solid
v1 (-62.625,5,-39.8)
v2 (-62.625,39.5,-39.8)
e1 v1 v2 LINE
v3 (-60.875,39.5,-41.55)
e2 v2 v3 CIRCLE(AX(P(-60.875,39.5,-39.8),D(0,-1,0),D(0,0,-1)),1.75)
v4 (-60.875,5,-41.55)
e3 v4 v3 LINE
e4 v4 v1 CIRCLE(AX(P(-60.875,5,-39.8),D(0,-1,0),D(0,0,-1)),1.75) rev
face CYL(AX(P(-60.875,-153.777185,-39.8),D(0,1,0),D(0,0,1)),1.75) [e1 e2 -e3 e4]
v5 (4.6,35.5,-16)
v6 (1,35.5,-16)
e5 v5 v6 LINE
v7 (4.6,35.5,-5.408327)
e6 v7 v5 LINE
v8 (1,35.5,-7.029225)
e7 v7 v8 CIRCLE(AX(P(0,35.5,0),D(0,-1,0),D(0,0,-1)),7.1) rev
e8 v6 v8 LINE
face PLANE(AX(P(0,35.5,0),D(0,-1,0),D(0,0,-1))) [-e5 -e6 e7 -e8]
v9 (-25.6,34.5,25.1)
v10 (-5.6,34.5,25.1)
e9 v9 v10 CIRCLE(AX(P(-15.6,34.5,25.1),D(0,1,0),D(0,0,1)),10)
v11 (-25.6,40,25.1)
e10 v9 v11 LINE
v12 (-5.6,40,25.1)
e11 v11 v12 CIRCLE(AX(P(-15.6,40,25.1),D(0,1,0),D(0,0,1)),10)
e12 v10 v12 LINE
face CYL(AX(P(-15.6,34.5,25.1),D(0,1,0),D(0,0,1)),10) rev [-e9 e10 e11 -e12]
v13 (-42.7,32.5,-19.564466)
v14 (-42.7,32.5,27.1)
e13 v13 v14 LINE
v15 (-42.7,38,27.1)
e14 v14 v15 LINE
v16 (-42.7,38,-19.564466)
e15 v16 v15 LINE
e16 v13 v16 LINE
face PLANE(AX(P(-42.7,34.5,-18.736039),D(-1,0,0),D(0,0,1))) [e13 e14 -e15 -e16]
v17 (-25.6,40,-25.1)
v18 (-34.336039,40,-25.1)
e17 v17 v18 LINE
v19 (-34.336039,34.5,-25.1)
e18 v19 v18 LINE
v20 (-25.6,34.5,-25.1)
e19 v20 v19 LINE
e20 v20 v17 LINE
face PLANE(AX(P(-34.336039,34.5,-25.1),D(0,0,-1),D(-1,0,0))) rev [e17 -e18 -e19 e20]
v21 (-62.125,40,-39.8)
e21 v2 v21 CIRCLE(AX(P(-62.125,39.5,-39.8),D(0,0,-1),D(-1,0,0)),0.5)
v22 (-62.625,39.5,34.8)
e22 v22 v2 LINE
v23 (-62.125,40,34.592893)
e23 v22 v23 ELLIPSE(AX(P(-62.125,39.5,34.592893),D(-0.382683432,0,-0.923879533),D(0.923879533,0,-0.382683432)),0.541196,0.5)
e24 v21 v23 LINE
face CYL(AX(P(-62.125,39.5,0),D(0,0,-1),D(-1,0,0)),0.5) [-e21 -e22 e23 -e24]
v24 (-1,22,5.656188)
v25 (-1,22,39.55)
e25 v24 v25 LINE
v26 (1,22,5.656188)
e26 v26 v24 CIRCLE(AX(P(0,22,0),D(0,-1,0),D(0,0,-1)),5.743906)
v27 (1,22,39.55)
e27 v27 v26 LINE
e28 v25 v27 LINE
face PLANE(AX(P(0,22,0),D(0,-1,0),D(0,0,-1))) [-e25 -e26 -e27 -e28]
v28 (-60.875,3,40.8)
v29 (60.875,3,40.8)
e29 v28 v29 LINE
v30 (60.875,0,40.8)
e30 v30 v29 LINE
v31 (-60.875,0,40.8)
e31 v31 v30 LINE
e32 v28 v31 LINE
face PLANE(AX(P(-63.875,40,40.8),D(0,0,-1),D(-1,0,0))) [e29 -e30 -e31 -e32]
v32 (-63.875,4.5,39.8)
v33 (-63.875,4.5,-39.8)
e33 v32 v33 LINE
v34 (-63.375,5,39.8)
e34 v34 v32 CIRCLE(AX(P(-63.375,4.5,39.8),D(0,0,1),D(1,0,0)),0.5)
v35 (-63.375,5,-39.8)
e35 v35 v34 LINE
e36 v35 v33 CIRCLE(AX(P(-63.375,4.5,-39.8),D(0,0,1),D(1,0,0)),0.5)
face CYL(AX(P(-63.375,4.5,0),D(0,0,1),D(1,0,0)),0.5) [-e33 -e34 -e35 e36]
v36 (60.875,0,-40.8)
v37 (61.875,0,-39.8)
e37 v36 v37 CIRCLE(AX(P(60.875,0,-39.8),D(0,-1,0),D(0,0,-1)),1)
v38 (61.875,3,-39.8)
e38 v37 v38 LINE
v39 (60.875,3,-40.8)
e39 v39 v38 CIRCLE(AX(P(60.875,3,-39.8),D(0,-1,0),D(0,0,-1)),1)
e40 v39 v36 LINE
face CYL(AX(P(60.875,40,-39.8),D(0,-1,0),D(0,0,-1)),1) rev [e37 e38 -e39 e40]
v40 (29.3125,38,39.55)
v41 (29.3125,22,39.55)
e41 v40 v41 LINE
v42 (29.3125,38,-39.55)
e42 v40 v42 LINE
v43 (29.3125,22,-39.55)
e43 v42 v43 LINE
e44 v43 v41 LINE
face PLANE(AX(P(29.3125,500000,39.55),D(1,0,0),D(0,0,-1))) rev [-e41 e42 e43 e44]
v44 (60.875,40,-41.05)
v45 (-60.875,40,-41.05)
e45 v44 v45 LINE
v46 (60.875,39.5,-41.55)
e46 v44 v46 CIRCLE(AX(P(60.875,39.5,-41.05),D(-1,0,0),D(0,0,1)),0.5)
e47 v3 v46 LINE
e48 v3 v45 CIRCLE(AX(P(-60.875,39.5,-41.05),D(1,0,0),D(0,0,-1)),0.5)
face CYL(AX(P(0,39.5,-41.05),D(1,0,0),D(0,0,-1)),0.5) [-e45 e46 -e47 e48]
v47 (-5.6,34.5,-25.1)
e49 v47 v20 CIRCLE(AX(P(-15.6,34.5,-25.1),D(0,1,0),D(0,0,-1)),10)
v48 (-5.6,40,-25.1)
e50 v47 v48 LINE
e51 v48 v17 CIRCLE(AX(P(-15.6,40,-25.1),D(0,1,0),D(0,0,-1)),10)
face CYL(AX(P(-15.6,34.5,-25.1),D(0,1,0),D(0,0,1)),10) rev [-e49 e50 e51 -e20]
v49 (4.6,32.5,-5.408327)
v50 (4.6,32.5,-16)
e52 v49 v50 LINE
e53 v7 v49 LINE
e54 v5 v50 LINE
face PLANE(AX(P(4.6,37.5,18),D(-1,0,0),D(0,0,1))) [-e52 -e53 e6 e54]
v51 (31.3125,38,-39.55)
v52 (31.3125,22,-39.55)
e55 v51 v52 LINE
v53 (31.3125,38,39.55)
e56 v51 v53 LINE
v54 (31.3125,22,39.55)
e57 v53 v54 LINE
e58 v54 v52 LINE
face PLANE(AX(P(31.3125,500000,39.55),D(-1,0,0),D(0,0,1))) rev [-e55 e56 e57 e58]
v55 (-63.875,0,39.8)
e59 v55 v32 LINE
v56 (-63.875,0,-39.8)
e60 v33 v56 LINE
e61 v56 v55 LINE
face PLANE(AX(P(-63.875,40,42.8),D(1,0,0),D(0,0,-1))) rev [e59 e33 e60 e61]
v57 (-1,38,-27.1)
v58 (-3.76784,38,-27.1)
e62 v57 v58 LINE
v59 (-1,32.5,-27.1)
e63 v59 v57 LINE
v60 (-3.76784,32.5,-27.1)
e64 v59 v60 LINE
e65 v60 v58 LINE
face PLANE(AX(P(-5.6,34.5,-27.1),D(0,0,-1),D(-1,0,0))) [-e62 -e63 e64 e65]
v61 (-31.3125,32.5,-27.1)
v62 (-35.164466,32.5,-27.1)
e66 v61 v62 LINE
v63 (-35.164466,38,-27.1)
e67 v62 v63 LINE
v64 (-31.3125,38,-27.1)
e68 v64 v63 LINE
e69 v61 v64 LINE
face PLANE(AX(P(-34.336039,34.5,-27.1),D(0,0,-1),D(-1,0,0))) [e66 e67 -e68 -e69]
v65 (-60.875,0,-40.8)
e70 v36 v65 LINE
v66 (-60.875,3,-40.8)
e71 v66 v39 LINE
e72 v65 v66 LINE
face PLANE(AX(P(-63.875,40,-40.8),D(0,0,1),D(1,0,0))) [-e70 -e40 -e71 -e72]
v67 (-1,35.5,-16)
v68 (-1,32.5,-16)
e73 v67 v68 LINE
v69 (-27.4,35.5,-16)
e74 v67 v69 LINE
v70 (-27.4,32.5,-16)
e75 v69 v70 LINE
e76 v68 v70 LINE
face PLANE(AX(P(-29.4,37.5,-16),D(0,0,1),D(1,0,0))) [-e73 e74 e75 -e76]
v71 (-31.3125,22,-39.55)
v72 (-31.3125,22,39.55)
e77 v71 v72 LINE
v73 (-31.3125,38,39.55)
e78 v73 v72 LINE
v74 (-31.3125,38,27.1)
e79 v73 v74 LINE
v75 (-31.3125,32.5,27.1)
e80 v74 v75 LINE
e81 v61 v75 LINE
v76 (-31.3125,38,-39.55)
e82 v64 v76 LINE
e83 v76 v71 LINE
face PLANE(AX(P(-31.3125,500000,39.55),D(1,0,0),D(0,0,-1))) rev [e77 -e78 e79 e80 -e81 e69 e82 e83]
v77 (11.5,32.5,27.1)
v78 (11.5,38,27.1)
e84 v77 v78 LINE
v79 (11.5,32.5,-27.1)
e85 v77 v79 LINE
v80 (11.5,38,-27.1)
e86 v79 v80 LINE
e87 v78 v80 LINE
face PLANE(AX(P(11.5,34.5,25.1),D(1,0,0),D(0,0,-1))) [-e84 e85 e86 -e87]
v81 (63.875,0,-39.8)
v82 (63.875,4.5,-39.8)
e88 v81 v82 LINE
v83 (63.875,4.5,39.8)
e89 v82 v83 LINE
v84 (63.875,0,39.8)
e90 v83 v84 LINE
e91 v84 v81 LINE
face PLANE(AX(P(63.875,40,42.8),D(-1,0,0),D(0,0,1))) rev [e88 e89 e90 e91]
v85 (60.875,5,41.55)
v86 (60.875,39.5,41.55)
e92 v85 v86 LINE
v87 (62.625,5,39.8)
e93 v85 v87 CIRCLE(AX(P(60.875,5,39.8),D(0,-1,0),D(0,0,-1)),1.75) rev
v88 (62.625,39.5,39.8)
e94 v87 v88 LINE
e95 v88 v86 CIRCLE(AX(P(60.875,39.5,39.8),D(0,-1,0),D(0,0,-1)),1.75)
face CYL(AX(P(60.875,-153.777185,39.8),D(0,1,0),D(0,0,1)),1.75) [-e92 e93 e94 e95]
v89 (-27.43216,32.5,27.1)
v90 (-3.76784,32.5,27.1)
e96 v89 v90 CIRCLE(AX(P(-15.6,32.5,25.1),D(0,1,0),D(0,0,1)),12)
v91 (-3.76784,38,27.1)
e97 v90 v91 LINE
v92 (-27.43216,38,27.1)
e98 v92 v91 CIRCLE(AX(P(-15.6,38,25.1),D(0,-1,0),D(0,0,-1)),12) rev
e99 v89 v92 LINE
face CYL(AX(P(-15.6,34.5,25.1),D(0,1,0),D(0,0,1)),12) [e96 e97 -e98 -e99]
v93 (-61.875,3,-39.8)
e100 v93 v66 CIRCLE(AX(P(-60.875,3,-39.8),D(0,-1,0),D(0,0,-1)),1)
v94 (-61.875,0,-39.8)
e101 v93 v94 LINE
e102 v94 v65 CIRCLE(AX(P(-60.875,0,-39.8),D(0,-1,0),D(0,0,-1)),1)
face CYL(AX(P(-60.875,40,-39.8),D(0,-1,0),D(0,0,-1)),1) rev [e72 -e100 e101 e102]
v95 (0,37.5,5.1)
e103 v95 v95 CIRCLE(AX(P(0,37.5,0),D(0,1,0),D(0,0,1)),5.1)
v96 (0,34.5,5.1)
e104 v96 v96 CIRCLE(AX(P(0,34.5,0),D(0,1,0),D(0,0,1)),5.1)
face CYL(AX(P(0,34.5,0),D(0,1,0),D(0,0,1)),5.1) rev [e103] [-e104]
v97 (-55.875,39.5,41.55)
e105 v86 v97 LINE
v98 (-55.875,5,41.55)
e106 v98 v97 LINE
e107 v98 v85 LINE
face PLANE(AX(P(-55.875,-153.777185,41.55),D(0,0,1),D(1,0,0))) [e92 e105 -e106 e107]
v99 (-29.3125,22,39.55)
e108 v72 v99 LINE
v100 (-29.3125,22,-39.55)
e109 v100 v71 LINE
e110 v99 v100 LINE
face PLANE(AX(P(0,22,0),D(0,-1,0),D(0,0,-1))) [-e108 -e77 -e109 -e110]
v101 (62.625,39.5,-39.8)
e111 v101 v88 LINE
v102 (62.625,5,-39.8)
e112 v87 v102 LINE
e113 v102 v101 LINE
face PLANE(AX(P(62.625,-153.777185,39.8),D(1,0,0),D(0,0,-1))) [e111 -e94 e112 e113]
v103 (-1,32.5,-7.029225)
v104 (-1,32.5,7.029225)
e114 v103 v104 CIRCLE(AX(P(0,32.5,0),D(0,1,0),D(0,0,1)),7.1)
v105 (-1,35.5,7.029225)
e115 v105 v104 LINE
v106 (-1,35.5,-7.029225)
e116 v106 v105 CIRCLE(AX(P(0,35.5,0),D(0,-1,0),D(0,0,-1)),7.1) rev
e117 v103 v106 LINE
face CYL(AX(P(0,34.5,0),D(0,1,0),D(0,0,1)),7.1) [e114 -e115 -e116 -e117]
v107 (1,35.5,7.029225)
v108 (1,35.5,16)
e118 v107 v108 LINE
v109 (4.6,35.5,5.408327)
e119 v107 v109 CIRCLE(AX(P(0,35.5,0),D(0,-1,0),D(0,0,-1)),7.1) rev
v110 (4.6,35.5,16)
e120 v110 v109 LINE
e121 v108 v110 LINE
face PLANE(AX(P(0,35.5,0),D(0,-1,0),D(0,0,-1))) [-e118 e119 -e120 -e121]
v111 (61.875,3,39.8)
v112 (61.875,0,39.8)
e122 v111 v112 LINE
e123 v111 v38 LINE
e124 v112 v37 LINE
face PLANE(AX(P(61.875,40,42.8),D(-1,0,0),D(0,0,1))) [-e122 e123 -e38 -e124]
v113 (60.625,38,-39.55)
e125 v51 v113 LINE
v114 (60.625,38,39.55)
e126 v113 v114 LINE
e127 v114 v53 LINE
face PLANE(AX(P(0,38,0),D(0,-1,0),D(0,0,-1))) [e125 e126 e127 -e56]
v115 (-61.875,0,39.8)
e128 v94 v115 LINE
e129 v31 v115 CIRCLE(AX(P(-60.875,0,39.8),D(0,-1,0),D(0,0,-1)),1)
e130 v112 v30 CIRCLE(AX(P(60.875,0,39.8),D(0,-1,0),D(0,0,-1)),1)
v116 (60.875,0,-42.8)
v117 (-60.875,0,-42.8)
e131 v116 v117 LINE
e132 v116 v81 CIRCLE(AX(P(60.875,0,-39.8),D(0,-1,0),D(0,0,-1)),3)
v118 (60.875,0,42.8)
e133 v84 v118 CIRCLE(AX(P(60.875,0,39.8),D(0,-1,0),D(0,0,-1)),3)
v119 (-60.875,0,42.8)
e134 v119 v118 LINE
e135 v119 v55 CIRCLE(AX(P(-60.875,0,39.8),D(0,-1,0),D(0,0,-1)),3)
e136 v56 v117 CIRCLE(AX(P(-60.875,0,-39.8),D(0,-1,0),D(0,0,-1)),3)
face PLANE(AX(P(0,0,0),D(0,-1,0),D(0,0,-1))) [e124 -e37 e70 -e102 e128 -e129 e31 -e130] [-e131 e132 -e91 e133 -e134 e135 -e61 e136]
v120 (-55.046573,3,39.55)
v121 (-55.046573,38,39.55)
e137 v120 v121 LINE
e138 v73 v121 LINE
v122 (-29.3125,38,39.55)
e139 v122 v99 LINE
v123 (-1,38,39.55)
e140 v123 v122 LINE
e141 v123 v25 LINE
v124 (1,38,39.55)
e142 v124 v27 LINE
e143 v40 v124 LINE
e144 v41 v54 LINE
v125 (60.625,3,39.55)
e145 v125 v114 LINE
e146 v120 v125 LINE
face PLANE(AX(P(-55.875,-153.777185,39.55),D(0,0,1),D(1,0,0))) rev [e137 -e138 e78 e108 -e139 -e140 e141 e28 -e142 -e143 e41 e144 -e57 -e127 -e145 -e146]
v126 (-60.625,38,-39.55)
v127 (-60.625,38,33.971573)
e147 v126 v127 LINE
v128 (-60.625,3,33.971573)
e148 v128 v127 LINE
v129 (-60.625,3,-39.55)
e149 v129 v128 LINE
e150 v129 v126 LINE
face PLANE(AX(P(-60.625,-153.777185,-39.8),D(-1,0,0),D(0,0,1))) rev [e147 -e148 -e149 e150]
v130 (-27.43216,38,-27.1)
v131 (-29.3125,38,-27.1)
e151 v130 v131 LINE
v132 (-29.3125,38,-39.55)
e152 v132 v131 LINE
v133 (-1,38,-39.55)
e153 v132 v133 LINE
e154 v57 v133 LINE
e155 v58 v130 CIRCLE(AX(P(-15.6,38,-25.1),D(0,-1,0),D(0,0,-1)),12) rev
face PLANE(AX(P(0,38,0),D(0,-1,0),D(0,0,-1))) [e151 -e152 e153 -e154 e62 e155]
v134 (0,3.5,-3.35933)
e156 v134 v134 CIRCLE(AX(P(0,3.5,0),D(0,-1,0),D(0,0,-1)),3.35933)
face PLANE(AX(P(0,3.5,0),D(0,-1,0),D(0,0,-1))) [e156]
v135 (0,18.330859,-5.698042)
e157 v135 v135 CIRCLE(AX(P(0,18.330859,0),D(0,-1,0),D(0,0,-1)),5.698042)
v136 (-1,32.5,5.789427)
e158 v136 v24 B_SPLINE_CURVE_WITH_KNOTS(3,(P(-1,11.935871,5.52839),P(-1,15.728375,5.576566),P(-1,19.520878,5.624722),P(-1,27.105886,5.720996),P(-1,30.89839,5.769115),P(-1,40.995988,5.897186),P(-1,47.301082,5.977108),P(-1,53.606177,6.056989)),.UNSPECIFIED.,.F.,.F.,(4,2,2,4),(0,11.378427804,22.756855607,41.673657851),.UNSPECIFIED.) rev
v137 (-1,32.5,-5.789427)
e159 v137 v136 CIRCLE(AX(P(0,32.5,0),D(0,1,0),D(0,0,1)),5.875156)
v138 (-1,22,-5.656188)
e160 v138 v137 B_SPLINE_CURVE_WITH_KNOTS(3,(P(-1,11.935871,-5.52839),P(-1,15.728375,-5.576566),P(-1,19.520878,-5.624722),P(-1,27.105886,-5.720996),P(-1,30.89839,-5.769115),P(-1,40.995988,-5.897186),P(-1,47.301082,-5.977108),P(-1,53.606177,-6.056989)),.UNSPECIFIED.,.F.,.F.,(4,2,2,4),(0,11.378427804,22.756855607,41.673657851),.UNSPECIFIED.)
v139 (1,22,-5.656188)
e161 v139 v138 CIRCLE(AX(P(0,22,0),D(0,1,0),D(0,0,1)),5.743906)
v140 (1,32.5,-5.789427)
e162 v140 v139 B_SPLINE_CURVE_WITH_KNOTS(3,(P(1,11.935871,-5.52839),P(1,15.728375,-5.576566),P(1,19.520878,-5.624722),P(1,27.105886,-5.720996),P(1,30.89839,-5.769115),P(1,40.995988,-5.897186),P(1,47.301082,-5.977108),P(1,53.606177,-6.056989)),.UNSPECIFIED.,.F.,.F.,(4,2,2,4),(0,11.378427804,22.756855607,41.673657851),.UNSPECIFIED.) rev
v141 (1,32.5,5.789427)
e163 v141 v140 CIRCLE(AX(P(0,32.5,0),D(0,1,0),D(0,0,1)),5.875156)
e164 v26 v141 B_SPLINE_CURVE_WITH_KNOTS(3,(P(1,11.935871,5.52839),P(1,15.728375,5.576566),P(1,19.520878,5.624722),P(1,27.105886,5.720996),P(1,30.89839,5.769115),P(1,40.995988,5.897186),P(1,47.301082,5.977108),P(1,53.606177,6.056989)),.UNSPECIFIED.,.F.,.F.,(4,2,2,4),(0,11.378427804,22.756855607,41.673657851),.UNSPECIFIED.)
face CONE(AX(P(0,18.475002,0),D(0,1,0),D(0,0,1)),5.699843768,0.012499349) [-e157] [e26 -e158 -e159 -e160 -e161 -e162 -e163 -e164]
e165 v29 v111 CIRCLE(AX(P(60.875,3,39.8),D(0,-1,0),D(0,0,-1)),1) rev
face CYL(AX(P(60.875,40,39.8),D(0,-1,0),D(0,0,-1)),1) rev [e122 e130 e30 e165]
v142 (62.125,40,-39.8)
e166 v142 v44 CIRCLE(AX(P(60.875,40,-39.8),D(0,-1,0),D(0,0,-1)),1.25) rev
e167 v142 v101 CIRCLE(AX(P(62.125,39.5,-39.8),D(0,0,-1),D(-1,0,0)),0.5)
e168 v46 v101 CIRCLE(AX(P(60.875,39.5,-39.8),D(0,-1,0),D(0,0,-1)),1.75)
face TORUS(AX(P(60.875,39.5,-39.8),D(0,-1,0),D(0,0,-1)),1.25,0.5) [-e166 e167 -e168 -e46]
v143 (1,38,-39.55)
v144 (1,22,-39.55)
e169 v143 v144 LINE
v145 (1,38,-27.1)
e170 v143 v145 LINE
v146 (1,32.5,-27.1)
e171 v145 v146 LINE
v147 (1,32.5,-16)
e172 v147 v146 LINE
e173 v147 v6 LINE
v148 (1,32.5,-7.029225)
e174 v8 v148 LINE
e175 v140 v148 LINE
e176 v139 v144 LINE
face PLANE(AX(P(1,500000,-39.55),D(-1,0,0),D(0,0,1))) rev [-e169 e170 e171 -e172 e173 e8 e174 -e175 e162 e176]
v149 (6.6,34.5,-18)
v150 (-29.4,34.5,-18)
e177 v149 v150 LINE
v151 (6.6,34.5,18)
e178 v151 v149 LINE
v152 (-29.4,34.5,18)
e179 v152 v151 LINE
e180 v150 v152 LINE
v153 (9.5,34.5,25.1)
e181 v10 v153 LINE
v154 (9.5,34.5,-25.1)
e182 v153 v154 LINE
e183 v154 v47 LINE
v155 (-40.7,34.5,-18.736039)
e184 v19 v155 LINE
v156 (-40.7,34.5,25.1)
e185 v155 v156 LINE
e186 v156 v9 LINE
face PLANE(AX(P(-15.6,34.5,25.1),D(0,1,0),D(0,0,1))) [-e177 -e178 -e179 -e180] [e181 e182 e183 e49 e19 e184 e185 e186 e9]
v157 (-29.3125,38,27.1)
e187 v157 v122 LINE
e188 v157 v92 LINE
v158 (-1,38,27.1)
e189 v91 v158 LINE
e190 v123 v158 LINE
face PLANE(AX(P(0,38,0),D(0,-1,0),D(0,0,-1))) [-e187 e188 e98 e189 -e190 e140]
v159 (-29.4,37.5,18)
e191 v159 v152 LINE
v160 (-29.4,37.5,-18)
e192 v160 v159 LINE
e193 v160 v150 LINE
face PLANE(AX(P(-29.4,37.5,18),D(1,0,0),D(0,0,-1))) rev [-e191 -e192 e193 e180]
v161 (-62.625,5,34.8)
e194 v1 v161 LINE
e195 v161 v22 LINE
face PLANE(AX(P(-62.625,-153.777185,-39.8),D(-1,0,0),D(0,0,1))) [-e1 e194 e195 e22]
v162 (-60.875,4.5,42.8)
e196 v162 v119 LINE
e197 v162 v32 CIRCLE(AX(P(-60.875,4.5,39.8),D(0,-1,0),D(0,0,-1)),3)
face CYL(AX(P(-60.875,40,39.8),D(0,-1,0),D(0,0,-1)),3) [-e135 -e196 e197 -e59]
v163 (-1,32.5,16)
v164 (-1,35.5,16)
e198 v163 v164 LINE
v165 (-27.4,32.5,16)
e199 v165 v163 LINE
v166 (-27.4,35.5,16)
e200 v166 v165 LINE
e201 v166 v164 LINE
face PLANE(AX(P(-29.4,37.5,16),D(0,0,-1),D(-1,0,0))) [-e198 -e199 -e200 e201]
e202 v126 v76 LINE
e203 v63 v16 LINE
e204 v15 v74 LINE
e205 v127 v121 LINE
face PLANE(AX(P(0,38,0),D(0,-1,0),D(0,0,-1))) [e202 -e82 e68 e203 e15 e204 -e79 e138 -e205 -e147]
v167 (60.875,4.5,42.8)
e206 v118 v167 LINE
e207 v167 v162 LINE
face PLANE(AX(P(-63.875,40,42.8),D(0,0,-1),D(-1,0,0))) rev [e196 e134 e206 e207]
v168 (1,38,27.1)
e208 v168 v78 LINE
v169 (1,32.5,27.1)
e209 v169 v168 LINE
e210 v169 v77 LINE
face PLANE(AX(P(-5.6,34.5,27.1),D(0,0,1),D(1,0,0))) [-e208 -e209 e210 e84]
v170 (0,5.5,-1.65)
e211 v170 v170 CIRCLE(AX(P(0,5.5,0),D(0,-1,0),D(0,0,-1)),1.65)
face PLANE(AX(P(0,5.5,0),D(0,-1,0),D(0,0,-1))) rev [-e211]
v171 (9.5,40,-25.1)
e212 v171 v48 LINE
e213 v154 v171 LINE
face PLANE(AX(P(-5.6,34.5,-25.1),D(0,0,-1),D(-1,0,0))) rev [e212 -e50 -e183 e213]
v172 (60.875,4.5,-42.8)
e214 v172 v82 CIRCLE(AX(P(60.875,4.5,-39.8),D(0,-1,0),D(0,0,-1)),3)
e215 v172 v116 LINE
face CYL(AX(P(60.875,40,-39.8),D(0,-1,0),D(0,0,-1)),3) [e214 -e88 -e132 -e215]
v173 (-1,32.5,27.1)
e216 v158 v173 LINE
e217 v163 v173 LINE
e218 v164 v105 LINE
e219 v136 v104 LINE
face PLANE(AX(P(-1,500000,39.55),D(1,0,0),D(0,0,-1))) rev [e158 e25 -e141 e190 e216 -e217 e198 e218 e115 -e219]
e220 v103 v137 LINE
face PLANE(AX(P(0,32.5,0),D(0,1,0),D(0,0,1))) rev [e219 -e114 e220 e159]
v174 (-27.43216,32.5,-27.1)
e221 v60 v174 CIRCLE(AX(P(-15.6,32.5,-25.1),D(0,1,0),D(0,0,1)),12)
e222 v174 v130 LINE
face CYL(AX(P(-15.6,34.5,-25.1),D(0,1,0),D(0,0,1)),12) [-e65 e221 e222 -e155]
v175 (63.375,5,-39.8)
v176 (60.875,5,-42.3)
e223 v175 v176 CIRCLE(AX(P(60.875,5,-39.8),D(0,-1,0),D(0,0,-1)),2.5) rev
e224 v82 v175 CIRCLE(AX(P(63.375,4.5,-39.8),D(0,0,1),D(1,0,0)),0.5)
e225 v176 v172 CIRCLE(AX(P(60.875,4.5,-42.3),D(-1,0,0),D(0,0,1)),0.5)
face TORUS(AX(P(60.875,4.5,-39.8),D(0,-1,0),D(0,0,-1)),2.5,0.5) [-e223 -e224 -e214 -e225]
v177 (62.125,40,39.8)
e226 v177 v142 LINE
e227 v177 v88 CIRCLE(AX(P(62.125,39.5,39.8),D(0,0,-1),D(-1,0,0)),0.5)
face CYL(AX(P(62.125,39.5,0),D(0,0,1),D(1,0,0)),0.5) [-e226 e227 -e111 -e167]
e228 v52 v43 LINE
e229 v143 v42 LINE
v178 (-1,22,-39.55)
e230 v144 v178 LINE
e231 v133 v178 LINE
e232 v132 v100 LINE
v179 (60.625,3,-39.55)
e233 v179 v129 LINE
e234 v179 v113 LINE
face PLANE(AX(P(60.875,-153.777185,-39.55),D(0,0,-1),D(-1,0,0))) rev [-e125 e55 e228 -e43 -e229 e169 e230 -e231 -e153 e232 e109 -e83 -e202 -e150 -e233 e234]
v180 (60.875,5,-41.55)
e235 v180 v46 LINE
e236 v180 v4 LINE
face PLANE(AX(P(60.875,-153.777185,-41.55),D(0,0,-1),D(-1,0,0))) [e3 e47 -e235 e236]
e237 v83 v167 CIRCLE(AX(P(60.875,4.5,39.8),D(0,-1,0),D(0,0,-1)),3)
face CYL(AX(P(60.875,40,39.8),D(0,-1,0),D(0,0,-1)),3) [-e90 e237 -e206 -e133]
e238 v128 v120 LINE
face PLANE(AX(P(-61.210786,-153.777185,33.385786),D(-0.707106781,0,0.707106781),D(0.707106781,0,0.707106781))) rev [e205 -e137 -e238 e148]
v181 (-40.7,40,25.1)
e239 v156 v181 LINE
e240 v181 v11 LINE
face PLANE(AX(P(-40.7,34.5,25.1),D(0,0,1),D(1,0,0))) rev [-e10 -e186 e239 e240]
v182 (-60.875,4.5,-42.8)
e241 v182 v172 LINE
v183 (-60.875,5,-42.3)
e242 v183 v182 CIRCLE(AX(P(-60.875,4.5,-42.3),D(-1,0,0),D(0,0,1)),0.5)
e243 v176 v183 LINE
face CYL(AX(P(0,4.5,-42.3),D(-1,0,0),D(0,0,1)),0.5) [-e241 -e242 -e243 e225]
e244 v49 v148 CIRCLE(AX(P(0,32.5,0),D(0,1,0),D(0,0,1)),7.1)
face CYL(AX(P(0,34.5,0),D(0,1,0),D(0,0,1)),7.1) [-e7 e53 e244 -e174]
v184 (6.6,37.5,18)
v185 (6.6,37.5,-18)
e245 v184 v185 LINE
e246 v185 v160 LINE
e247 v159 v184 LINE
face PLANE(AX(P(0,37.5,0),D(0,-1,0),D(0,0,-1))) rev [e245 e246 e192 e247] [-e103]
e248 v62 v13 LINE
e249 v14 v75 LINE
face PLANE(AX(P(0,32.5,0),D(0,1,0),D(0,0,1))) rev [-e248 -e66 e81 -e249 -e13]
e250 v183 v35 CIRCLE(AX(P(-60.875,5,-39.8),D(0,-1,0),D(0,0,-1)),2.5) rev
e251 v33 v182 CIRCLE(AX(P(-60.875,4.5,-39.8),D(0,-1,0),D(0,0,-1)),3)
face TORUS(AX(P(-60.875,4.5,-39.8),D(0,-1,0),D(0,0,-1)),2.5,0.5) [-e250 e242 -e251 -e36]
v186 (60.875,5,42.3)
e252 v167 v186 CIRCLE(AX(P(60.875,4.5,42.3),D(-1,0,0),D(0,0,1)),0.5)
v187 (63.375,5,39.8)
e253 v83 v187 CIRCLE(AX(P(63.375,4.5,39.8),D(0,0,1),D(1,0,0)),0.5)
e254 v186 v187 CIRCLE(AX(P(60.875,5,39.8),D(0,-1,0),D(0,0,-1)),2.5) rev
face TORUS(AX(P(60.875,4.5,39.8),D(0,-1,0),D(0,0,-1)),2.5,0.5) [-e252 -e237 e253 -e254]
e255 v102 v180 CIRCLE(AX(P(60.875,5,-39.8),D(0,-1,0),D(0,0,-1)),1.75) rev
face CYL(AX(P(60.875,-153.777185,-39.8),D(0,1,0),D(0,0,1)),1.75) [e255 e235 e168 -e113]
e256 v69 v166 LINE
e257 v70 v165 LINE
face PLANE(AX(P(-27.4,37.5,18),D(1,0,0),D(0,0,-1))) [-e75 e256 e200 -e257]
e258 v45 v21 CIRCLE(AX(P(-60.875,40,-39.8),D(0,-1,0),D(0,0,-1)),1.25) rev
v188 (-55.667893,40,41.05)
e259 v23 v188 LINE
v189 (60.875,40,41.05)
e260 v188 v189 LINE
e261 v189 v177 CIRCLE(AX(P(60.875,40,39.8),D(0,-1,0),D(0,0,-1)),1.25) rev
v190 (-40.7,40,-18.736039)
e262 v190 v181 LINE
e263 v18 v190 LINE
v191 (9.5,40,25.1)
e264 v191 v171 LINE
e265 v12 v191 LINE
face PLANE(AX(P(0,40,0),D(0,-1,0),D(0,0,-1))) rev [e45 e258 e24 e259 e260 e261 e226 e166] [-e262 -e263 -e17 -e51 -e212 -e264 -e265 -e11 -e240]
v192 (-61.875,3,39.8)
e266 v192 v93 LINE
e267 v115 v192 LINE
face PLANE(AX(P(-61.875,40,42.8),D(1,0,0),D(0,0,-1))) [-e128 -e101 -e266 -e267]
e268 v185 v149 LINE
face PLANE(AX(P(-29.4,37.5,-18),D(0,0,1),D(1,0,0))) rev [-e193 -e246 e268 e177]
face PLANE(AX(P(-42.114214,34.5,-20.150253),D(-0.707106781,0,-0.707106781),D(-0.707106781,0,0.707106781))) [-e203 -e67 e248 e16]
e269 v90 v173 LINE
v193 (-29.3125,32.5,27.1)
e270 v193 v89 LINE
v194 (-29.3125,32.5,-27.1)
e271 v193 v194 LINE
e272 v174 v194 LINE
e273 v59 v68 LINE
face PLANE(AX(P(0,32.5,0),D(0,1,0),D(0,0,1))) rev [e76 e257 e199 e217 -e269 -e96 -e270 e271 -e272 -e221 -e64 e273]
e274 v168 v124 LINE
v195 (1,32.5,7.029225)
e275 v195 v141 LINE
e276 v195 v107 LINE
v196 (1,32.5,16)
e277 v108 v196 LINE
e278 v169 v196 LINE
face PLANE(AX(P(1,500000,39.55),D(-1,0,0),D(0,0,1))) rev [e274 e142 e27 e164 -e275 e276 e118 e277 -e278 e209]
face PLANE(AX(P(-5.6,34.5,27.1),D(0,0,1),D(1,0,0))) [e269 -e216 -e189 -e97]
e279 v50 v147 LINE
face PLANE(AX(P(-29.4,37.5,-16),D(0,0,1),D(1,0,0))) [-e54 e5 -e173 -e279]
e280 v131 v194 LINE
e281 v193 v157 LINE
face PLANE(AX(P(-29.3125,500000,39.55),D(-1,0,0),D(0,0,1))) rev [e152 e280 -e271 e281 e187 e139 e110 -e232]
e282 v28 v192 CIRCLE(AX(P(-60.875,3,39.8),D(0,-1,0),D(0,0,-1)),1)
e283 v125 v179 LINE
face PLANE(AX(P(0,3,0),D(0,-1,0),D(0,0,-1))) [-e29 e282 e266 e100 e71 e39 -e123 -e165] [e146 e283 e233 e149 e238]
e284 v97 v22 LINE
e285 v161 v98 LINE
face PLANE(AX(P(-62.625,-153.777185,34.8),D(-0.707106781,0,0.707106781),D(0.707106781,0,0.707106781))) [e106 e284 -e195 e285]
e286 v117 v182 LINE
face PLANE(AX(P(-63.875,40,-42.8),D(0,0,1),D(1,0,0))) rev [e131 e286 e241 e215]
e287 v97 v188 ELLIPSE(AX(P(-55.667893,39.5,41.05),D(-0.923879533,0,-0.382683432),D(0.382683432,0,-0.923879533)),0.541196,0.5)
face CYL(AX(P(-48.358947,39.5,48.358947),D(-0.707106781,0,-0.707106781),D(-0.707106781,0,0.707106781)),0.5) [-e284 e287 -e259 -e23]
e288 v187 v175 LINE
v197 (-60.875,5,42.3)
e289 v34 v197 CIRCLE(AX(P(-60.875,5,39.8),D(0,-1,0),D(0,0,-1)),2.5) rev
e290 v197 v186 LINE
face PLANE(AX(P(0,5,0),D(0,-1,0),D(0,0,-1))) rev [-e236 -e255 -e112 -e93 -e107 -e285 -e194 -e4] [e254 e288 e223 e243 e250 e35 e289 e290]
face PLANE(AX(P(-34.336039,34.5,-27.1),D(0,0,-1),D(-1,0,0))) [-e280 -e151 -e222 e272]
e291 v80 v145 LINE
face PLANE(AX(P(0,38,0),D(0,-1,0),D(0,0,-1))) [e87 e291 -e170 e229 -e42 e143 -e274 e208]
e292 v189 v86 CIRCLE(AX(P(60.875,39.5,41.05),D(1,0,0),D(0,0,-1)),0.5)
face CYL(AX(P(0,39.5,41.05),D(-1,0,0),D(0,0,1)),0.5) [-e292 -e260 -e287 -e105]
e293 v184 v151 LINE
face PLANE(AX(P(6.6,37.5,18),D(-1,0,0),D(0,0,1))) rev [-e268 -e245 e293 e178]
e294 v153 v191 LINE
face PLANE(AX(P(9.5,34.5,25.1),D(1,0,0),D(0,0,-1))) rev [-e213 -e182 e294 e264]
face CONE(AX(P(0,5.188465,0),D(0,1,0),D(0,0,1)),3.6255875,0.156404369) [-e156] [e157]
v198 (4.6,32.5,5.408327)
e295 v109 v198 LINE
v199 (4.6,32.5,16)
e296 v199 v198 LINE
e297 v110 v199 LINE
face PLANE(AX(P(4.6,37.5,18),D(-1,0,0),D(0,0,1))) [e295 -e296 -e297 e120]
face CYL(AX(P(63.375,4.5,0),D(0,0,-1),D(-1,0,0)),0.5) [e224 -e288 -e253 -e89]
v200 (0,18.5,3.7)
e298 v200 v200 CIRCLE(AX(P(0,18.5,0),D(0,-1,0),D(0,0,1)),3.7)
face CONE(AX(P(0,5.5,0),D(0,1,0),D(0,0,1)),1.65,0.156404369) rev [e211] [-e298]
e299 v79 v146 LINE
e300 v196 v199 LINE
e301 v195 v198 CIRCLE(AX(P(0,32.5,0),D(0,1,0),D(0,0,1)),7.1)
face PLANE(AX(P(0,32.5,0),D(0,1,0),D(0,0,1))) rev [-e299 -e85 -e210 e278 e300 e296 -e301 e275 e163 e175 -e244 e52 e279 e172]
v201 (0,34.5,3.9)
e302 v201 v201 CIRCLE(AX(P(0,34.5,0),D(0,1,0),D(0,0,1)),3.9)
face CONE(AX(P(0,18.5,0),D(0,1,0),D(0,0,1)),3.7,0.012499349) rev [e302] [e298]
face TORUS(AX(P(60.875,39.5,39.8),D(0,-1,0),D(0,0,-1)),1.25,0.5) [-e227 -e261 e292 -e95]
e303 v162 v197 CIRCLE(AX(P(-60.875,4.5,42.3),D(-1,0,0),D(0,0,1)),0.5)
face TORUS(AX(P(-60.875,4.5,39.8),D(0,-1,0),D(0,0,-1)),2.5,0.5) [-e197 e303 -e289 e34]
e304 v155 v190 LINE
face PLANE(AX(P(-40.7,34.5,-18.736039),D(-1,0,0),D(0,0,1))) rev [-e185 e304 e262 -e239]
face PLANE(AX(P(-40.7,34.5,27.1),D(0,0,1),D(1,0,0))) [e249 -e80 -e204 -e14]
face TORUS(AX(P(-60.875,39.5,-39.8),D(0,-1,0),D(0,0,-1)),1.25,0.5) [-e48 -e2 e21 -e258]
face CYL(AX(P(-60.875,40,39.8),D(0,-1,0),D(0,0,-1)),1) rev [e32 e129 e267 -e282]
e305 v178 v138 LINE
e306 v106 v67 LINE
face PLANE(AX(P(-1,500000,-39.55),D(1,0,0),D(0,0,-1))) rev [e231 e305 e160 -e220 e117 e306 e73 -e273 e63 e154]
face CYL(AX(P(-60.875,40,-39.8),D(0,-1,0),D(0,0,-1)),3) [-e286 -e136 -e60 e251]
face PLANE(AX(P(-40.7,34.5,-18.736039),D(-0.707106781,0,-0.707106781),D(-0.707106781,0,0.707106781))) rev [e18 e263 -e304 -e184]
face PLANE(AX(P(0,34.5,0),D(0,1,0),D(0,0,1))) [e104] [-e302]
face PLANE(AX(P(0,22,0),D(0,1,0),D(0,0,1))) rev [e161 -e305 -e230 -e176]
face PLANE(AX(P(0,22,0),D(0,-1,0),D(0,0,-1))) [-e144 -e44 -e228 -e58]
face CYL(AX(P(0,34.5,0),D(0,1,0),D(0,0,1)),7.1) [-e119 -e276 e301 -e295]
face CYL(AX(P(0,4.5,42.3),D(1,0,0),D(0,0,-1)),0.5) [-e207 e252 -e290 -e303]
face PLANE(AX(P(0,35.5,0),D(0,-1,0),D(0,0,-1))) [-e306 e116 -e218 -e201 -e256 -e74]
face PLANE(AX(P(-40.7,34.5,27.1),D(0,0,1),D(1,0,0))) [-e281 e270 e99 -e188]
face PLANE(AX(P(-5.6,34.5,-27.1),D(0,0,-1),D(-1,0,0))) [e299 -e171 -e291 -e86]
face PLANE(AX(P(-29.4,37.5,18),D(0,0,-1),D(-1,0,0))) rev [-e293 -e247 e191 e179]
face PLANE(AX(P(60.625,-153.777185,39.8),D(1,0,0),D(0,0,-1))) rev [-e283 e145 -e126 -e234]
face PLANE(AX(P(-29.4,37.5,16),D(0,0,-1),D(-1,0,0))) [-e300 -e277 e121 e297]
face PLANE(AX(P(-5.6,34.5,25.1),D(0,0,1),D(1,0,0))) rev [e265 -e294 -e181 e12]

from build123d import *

# Parameters (mm, degrees)
SKETCH1_W           = 127.75
SKETCH1_H           = 85.6
BOSS_EXTRUDE1_DEPTH = 40
FILLET1_R           = 3
CUT_EXTRUDE2_DEPTH  = 35
FILLET5_R           = 0.5
FILLET6_R           = 0.5
CUT_EXTRUDE3_DEPTH  = 5.5
SKETCH8_W           = 36
SKETCH8_H           = 36
BOSS_EXTRUDE2_DEPTH = 3
SKETCH9_R           = 5.1
CUT_EXTRUDE5_DEPTH  = 3
SKETCH10_R          = 3.9
SKETCH11_R          = 3.7
SHELL1_DEPTH        = 35.5
SHELL1_START        = 35.5
SHELL1_2_DEPTH      = 2.5
SHELL1_3_DEPTH      = 3
SHELL1_START_2      = 3
SHELL1_4_DEPTH      = 0.5
SHELL1_START_3      = -55.046572875
SHELL1_6_DEPTH      = 115.671572875
BOSS_EXTRUDE3_REACH = 81.974
SKETCH13_W          = 2
SKETCH13_H          = 79.1
SKETCH13_H_2        = 33.940393737


with BuildPart() as part:
    # Sketch1 → Boss-Extrude1 (new body)
    with BuildSketch(Plane(origin=(0, 0, 0), x_dir=(1, 0, 0), z_dir=(0, 1, 0))):
        Rectangle(SKETCH1_W, SKETCH1_H)
    extrude(amount=BOSS_EXTRUDE1_DEPTH)

    # Fillet1
    fillet1_edges = [part.edges().sort_by_distance(p)[0] for p in [
        (-63.875, 20, -42.8),
        (63.875, 20, -42.8),
        (63.875, 20, 42.8),
        (-63.875, 20, 42.8),
    ]]
    fillet(fillet1_edges, radius=FILLET1_R)

    # Sketch3 → Cut-Extrude2 (cut)
    with BuildSketch(Plane(origin=(0, 40, 0), x_dir=(1, 0, 0), z_dir=(0, 1, 0))):
        with BuildLine():
            Line((-63.875, 39.8), (-63.875, -39.8))
            ThreePointArc((-63.875, -39.8), (-62.996320344, -41.921320344), (-60.875, -42.8))
            Line((-60.875, -42.8), (60.875, -42.8))
            ThreePointArc((60.875, -42.8), (62.996320344, -41.921320344), (63.875, -39.8))
            Line((63.875, -39.8), (63.875, 39.8))
            ThreePointArc((63.875, 39.8), (62.996320344, 41.921320344), (60.875, 42.8))
            Line((60.875, 42.8), (-60.875, 42.8))
            ThreePointArc((-60.875, 42.8), (-62.996320344, 41.921320344), (-63.875, 39.8))
        make_face()
        with BuildLine():
            Line((-62.625, 39.8), (-62.625, -34.8))
            Line((-62.625, -34.8), (-55.875, -41.55))
            Line((-55.875, -41.55), (60.875, -41.55))
            ThreePointArc((60.875, -41.55), (62.112436867, -41.037436867), (62.625, -39.8))
            Line((62.625, -39.8), (62.625, 39.8))
            ThreePointArc((62.625, 39.8), (62.112436867, 41.037436867), (60.875, 41.55))
            Line((60.875, 41.55), (-60.875, 41.55))
            ThreePointArc((-60.875, 41.55), (-62.112436867, 41.037436867), (-62.625, 39.8))
        make_face(mode=Mode.SUBTRACT)
    extrude(amount=-CUT_EXTRUDE2_DEPTH, mode=Mode.SUBTRACT)

    # Fillet5
    fillet5_edges = [part.edges().sort_by_distance(p)[0] for p in [
        (-62.996320344, 5, -41.921320344),
        (0, 5, -42.8),
        (62.996320344, 5, -41.921320344),
        (63.875, 5, 0),
        (62.996320344, 5, 41.921320344),
        (0, 5, 42.8),
        (-62.996320344, 5, 41.921320344),
        (-63.875, 5, 0),
    ]]
    fillet(fillet5_edges, radius=FILLET5_R)

    # Fillet6
    fillet6_edges = [part.edges().sort_by_distance(p)[0] for p in [
        (-62.112436867, 40, -41.037436867),
        (0, 40, -41.55),
        (62.112436867, 40, -41.037436867),
        (62.625, 40, 0),
        (62.112436867, 40, 41.037436867),
        (2.5, 40, 41.55),
        (-59.25, 40, 38.175),
        (-62.625, 40, -2.5),
    ]]
    fillet(fillet6_edges, radius=FILLET6_R)

    # Sketch5 → Cut-Extrude3 (cut)
    with BuildSketch(Plane(origin=(0, 40, 0), x_dir=(1, 0, 0), z_dir=(0, 1, 0))):
        with BuildLine():
            Line((-40.7, -25.1), (-25.6, -25.1))
            ThreePointArc((-25.6, -25.1), (-15.6, -35.1), (-5.6, -25.1))
            Line((-5.6, -25.1), (9.5, -25.1))
            Line((9.5, -25.1), (9.5, 25.1))
            Line((9.5, 25.1), (-5.6, 25.1))
            ThreePointArc((-5.6, 25.1), (-15.6, 35.1), (-25.6, 25.1))
            Line((-25.6, 25.1), (-34.336038969, 25.1))
            Line((-34.336038969, 25.1), (-40.7, 18.736038969))
            Line((-40.7, 18.736038969), (-40.7, -25.1))
        make_face()
    extrude(amount=-CUT_EXTRUDE3_DEPTH, mode=Mode.SUBTRACT)

    # Sketch8 → Boss-Extrude2 (add)
    with BuildSketch(Plane(origin=(0, 34.5, 0), x_dir=(1, 0, 0), z_dir=(0, 1, 0))):
        with Locations((-11.4, 0)):
            Rectangle(SKETCH8_W, SKETCH8_H)
    extrude(amount=BOSS_EXTRUDE2_DEPTH)

    # Sketch9 → Cut-Extrude5 (cut)
    with BuildSketch(Plane(origin=(0, 37.5, 0), x_dir=(1, 0, 0), z_dir=(0, 1, 0))):
        with Locations(Location((0, 0, 0), (0, 0, 270))):
            Circle(SKETCH9_R)
    extrude(amount=-CUT_EXTRUDE5_DEPTH, mode=Mode.SUBTRACT)

    # Sketch10 → Cut-Loft1 section 0
    with BuildSketch(Plane(origin=(0, 34.5, 0), x_dir=(1, 0, 0), z_dir=(0, 1, 0))):
        Circle(SKETCH10_R)
    # Sketch11 → Cut-Loft1 section 1
    with BuildSketch(Plane(origin=(0, 18.5, 0), x_dir=(1, 0, 0), z_dir=(0, 1, 0))):
        Circle(SKETCH11_R)
    loft(mode=Mode.SUBTRACT)

    # Sketch12 → Cut-Revolve1 (revolve, cut)
    with BuildSketch(Plane.XY, mode=Mode.PRIVATE) as cut_revolve1_sk:
        Polygon((0, 18.5), (3.700000041, 18.5), (1.65, 5.5), (0, 5.5), align=None)
    revolve(cut_revolve1_sk.sketch.rotate(Axis((0, 0, 0), (0, 1, 0)), 270), axis=Axis((0, 0, 0), (0, 1, 0)), mode=Mode.SUBTRACT)

    # Shell1: read off the stored shape, not the designer's step
    # Shell1 outline → Shell1 (cut)
    # profile 1 of 2: a face of its own
    with BuildSketch(Plane(origin=(0, 0, 0), x_dir=(1, 0, 0), z_dir=(0, 1, 0))):
        Polygon((60.625, -39.55), (60.625, 39.55), (-60.625, 39.55), (-60.625, -33.971572875), (-55.046572875, -39.55), align=None)
        with BuildLine():
            Line((-3.767840434, 27.1), (11.5, 27.1))
            Line((11.5, 27.1), (11.5, -27.1))
            Line((11.5, -27.1), (-3.767840434, -27.1))
            ThreePointArc((-3.767840434, -27.1), (-15.6, -37.1), (-27.432159566, -27.1))
            Line((-27.432159566, -27.1), (-42.7, -27.1))
            Line((-42.7, -27.1), (-42.7, 19.564466094))
            Line((-42.7, 19.564466094), (-35.164466094, 27.1))
            Line((-35.164466094, 27.1), (-27.432159566, 27.1))
            ThreePointArc((-27.432159566, 27.1), (-15.6, 37.1), (-3.767840434, 27.1))
        make_face(mode=Mode.SUBTRACT)
    # profile 2 of 2: a face of its own
    with BuildSketch(Plane(origin=(0, 0, 0), x_dir=(1, 0, 0), z_dir=(0, 1, 0))):
        with BuildLine():
            Line((4.6, -16), (4.6, -5.408326913))
            ThreePointArc((4.6, -5.408326913), (-7.1, 0), (4.6, 5.408326913))
            Line((4.6, 5.408326913), (4.6, 16))
            Line((4.6, 16), (-27.4, 16))
            Line((-27.4, 16), (-27.4, -16))
            Line((-27.4, -16), (4.6, -16))
        make_face()
    extrude(amount=SHELL1_DEPTH, mode=Mode.SUBTRACT)

    # Shell1 2 outline → Shell1 2 (cut)
    with BuildSketch(Plane(origin=(0, 0, 0), x_dir=(1, 0, 0), z_dir=(0, 1, 0)).offset(SHELL1_START)):
        Polygon((60.625, -39.55), (60.625, 39.55), (-60.625, 39.55), (-60.625, -33.971572875), (-55.046572875, -39.55), align=None)
        with BuildLine():
            Line((-3.767840434, 27.1), (11.5, 27.1))
            Line((11.5, 27.1), (11.5, -27.1))
            Line((11.5, -27.1), (-3.767840434, -27.1))
            ThreePointArc((-3.767840434, -27.1), (-15.6, -37.1), (-27.432159566, -27.1))
            Line((-27.432159566, -27.1), (-42.7, -27.1))
            Line((-42.7, -27.1), (-42.7, 19.564466094))
            Line((-42.7, 19.564466094), (-35.164466094, 27.1))
            Line((-35.164466094, 27.1), (-27.432159566, 27.1))
            ThreePointArc((-27.432159566, 27.1), (-15.6, 37.1), (-3.767840434, 27.1))
        make_face(mode=Mode.SUBTRACT)
    extrude(amount=SHELL1_2_DEPTH, mode=Mode.SUBTRACT)

    # Shell1 3 outline → Shell1 3 (cut)
    # profile 1 of 2: a face of its own
    with BuildSketch(Plane(origin=(0, 0, 0), x_dir=(1, 0, 0), z_dir=(0, 1, 0))):
        with BuildLine():
            Line((-61.875, 39.8), (-61.875, -39.8))
            ThreePointArc((-61.875, -39.8), (-61.582106781, -40.507106781), (-60.875, -40.8))
            Line((-60.875, -40.8), (60.875, -40.8))
            ThreePointArc((60.875, -40.8), (61.582106781, -40.507106781), (61.875, -39.8))
            Line((61.875, -39.8), (61.875, 39.8))
            ThreePointArc((61.875, 39.8), (61.582106781, 40.507106781), (60.875, 40.8))
            Line((60.875, 40.8), (-60.875, 40.8))
            ThreePointArc((-60.875, 40.8), (-61.582106781, 40.507106781), (-61.875, 39.8))
        make_face()
        Polygon((-60.625, 39.55), (60.625, 39.55), (60.625, -39.55), (-55.046572875, -39.55), (-60.625, -33.971572875), align=None, mode=Mode.SUBTRACT)
    # profile 2 of 2: a face of its own
    with BuildSketch(Plane(origin=(0, 0, 0), x_dir=(1, 0, 0), z_dir=(0, 1, 0))):
        with BuildLine():
            Line((11.5, -27.1), (11.5, 27.1))
            Line((11.5, 27.1), (-3.767840434, 27.1))
            ThreePointArc((-3.767840434, 27.1), (-15.6, 37.1), (-27.432159566, 27.1))
            Line((-27.432159566, 27.1), (-35.164466094, 27.1))
            Line((-35.164466094, 27.1), (-42.7, 19.564466094))
            Line((-42.7, 19.564466094), (-42.7, -27.1))
            Line((-42.7, -27.1), (-27.432159566, -27.1))
            ThreePointArc((-27.432159566, -27.1), (-15.6, -37.1), (-3.767840434, -27.1))
            Line((-3.767840434, -27.1), (11.5, -27.1))
        make_face()
        with BuildLine():
            ThreePointArc((4.6, 5.408326913), (-7.1, 0), (4.6, -5.408326913))
            Line((4.6, -5.408326913), (4.6, -16))
            Line((4.6, -16), (-27.4, -16))
            Line((-27.4, -16), (-27.4, 16))
            Line((-27.4, 16), (4.6, 16))
            Line((4.6, 16), (4.6, 5.408326913))
        make_face(mode=Mode.SUBTRACT)
    extrude(amount=SHELL1_3_DEPTH, mode=Mode.SUBTRACT)

    # Shell1 4 outline → Shell1 4 (cut)
    with BuildSketch(Plane(origin=(0, 0, 0), x_dir=(1, 0, 0), z_dir=(0, 1, 0)).offset(SHELL1_START_2)):
        with BuildLine():
            Line((11.5, -27.1), (11.5, 27.1))
            Line((11.5, 27.1), (-3.767840434, 27.1))
            ThreePointArc((-3.767840434, 27.1), (-15.6, 37.1), (-27.432159566, 27.1))
            Line((-27.432159566, 27.1), (-35.164466094, 27.1))
            Line((-35.164466094, 27.1), (-42.7, 19.564466094))
            Line((-42.7, 19.564466094), (-42.7, -27.1))
            Line((-42.7, -27.1), (-27.432159566, -27.1))
            ThreePointArc((-27.432159566, -27.1), (-15.6, -37.1), (-3.767840434, -27.1))
            Line((-3.767840434, -27.1), (11.5, -27.1))
        make_face()
        with BuildLine():
            ThreePointArc((4.6, 5.408326913), (-7.1, 0), (4.6, -5.408326913))
            Line((4.6, -5.408326913), (4.6, -16))
            Line((4.6, -16), (-27.4, -16))
            Line((-27.4, -16), (-27.4, 16))
            Line((-27.4, 16), (4.6, 16))
            Line((4.6, 16), (4.6, 5.408326913))
        make_face(mode=Mode.SUBTRACT)
    extrude(amount=SHELL1_4_DEPTH, mode=Mode.SUBTRACT)

    # Shell1 5 outline → Shell1 5 (revolve, cut)
    with BuildSketch(Plane.XY):
        Polygon((50.573708585, 32.5), (5.875156244, 32.5), (5.698041982, 18.330859059), (3.359329546, 3.5), (50.573708585, 3.5), align=None)
    revolve(axis=Axis((0, 0, 0), (0, 1, 0)), mode=Mode.SUBTRACT)

    # Shell1 6 outline → Shell1 6 (add)
    with BuildSketch(Plane.YZ.offset(SHELL1_START_3)):
        with BuildLine():
            Line((32.5, -39.55), (3.5, -39.55))
            Line((3.5, -39.55), (3.5, -42.8))
            Line((3.5, -42.8), (4.5, -42.8))
            ThreePointArc((4.5, -42.8), (4.853553391, -42.653553391), (5, -42.3))
            Line((5, -42.3), (5, -41.55))
            Line((5, -41.55), (32.5, -41.55))
            Line((32.5, -41.55), (32.5, -39.55))
        make_face()
        with BuildLine():
            Line((4.5, 42.8), (3.5, 42.8))
            Line((3.5, 42.8), (3.5, 39.55))
            Line((3.5, 39.55), (32.5, 39.55))
            Line((32.5, 39.55), (32.5, 41.55))
            Line((32.5, 41.55), (5, 41.55))
            Line((5, 41.55), (5, 42.3))
            ThreePointArc((5, 42.3), (4.853553391, 42.653553391), (4.5, 42.8))
        make_face()
    extrude(amount=SHELL1_6_DEPTH)

    # Sketch13 → Boss-Extrude3 (add, up to next)
    with BuildSketch(Plane(origin=(0, 22, 0), x_dir=(1, 0, 0), z_dir=(0, 1, 0)), mode=Mode.PRIVATE) as boss_extrude3_sk1:
        with Locations((-30.3125, 0)):
            Rectangle(SKETCH13_W, SKETCH13_H)
    boss_extrude3_tool1 = extrude(boss_extrude3_sk1.sketch, amount=BOSS_EXTRUDE3_REACH, mode=Mode.PRIVATE) - part.part
    # Sketch13 → Boss-Extrude3 (add, up to next)
    with BuildSketch(Plane(origin=(0, 22, 0), x_dir=(1, 0, 0), z_dir=(0, 1, 0)), mode=Mode.PRIVATE) as boss_extrude3_sk2:
        with Locations((30.3125, 0)):
            Rectangle(SKETCH13_W, SKETCH13_H)
    boss_extrude3_tool2 = extrude(boss_extrude3_sk2.sketch, amount=BOSS_EXTRUDE3_REACH, mode=Mode.PRIVATE) - part.part
    # Sketch13 → Boss-Extrude3 (add, up to next)
    with BuildSketch(Plane(origin=(0, 22, 0), x_dir=(1, 0, 0), z_dir=(0, 1, 0)), mode=Mode.PRIVATE) as boss_extrude3_sk3:
        with Locations((0, -22.579803132)):
            Rectangle(SKETCH13_W, SKETCH13_H_2)
    boss_extrude3_tool3 = extrude(boss_extrude3_sk3.sketch, amount=BOSS_EXTRUDE3_REACH, mode=Mode.PRIVATE) - part.part
    # Sketch13 → Boss-Extrude3 (add, up to next)
    with BuildSketch(Plane(origin=(0, 22, 0), x_dir=(1, 0, 0), z_dir=(0, 1, 0)), mode=Mode.PRIVATE) as boss_extrude3_sk4:
        with Locations((0, 22.579803132)):
            Rectangle(SKETCH13_W, SKETCH13_H_2)
    boss_extrude3_tool4 = extrude(boss_extrude3_sk4.sketch, amount=BOSS_EXTRUDE3_REACH, mode=Mode.PRIVATE) - part.part
    add(boss_extrude3_tool1.solids().sort_by_distance((-30.3125, 22, 0))[0])
    add(boss_extrude3_tool2.solids().sort_by_distance((30.3125, 22, 0))[0])
    add(boss_extrude3_tool3.solids().sort_by_distance((0, 22, 22.579803))[0])
    add(boss_extrude3_tool4.solids().sort_by_distance((0, 22, -22.579803))[0])


solid = part.part
